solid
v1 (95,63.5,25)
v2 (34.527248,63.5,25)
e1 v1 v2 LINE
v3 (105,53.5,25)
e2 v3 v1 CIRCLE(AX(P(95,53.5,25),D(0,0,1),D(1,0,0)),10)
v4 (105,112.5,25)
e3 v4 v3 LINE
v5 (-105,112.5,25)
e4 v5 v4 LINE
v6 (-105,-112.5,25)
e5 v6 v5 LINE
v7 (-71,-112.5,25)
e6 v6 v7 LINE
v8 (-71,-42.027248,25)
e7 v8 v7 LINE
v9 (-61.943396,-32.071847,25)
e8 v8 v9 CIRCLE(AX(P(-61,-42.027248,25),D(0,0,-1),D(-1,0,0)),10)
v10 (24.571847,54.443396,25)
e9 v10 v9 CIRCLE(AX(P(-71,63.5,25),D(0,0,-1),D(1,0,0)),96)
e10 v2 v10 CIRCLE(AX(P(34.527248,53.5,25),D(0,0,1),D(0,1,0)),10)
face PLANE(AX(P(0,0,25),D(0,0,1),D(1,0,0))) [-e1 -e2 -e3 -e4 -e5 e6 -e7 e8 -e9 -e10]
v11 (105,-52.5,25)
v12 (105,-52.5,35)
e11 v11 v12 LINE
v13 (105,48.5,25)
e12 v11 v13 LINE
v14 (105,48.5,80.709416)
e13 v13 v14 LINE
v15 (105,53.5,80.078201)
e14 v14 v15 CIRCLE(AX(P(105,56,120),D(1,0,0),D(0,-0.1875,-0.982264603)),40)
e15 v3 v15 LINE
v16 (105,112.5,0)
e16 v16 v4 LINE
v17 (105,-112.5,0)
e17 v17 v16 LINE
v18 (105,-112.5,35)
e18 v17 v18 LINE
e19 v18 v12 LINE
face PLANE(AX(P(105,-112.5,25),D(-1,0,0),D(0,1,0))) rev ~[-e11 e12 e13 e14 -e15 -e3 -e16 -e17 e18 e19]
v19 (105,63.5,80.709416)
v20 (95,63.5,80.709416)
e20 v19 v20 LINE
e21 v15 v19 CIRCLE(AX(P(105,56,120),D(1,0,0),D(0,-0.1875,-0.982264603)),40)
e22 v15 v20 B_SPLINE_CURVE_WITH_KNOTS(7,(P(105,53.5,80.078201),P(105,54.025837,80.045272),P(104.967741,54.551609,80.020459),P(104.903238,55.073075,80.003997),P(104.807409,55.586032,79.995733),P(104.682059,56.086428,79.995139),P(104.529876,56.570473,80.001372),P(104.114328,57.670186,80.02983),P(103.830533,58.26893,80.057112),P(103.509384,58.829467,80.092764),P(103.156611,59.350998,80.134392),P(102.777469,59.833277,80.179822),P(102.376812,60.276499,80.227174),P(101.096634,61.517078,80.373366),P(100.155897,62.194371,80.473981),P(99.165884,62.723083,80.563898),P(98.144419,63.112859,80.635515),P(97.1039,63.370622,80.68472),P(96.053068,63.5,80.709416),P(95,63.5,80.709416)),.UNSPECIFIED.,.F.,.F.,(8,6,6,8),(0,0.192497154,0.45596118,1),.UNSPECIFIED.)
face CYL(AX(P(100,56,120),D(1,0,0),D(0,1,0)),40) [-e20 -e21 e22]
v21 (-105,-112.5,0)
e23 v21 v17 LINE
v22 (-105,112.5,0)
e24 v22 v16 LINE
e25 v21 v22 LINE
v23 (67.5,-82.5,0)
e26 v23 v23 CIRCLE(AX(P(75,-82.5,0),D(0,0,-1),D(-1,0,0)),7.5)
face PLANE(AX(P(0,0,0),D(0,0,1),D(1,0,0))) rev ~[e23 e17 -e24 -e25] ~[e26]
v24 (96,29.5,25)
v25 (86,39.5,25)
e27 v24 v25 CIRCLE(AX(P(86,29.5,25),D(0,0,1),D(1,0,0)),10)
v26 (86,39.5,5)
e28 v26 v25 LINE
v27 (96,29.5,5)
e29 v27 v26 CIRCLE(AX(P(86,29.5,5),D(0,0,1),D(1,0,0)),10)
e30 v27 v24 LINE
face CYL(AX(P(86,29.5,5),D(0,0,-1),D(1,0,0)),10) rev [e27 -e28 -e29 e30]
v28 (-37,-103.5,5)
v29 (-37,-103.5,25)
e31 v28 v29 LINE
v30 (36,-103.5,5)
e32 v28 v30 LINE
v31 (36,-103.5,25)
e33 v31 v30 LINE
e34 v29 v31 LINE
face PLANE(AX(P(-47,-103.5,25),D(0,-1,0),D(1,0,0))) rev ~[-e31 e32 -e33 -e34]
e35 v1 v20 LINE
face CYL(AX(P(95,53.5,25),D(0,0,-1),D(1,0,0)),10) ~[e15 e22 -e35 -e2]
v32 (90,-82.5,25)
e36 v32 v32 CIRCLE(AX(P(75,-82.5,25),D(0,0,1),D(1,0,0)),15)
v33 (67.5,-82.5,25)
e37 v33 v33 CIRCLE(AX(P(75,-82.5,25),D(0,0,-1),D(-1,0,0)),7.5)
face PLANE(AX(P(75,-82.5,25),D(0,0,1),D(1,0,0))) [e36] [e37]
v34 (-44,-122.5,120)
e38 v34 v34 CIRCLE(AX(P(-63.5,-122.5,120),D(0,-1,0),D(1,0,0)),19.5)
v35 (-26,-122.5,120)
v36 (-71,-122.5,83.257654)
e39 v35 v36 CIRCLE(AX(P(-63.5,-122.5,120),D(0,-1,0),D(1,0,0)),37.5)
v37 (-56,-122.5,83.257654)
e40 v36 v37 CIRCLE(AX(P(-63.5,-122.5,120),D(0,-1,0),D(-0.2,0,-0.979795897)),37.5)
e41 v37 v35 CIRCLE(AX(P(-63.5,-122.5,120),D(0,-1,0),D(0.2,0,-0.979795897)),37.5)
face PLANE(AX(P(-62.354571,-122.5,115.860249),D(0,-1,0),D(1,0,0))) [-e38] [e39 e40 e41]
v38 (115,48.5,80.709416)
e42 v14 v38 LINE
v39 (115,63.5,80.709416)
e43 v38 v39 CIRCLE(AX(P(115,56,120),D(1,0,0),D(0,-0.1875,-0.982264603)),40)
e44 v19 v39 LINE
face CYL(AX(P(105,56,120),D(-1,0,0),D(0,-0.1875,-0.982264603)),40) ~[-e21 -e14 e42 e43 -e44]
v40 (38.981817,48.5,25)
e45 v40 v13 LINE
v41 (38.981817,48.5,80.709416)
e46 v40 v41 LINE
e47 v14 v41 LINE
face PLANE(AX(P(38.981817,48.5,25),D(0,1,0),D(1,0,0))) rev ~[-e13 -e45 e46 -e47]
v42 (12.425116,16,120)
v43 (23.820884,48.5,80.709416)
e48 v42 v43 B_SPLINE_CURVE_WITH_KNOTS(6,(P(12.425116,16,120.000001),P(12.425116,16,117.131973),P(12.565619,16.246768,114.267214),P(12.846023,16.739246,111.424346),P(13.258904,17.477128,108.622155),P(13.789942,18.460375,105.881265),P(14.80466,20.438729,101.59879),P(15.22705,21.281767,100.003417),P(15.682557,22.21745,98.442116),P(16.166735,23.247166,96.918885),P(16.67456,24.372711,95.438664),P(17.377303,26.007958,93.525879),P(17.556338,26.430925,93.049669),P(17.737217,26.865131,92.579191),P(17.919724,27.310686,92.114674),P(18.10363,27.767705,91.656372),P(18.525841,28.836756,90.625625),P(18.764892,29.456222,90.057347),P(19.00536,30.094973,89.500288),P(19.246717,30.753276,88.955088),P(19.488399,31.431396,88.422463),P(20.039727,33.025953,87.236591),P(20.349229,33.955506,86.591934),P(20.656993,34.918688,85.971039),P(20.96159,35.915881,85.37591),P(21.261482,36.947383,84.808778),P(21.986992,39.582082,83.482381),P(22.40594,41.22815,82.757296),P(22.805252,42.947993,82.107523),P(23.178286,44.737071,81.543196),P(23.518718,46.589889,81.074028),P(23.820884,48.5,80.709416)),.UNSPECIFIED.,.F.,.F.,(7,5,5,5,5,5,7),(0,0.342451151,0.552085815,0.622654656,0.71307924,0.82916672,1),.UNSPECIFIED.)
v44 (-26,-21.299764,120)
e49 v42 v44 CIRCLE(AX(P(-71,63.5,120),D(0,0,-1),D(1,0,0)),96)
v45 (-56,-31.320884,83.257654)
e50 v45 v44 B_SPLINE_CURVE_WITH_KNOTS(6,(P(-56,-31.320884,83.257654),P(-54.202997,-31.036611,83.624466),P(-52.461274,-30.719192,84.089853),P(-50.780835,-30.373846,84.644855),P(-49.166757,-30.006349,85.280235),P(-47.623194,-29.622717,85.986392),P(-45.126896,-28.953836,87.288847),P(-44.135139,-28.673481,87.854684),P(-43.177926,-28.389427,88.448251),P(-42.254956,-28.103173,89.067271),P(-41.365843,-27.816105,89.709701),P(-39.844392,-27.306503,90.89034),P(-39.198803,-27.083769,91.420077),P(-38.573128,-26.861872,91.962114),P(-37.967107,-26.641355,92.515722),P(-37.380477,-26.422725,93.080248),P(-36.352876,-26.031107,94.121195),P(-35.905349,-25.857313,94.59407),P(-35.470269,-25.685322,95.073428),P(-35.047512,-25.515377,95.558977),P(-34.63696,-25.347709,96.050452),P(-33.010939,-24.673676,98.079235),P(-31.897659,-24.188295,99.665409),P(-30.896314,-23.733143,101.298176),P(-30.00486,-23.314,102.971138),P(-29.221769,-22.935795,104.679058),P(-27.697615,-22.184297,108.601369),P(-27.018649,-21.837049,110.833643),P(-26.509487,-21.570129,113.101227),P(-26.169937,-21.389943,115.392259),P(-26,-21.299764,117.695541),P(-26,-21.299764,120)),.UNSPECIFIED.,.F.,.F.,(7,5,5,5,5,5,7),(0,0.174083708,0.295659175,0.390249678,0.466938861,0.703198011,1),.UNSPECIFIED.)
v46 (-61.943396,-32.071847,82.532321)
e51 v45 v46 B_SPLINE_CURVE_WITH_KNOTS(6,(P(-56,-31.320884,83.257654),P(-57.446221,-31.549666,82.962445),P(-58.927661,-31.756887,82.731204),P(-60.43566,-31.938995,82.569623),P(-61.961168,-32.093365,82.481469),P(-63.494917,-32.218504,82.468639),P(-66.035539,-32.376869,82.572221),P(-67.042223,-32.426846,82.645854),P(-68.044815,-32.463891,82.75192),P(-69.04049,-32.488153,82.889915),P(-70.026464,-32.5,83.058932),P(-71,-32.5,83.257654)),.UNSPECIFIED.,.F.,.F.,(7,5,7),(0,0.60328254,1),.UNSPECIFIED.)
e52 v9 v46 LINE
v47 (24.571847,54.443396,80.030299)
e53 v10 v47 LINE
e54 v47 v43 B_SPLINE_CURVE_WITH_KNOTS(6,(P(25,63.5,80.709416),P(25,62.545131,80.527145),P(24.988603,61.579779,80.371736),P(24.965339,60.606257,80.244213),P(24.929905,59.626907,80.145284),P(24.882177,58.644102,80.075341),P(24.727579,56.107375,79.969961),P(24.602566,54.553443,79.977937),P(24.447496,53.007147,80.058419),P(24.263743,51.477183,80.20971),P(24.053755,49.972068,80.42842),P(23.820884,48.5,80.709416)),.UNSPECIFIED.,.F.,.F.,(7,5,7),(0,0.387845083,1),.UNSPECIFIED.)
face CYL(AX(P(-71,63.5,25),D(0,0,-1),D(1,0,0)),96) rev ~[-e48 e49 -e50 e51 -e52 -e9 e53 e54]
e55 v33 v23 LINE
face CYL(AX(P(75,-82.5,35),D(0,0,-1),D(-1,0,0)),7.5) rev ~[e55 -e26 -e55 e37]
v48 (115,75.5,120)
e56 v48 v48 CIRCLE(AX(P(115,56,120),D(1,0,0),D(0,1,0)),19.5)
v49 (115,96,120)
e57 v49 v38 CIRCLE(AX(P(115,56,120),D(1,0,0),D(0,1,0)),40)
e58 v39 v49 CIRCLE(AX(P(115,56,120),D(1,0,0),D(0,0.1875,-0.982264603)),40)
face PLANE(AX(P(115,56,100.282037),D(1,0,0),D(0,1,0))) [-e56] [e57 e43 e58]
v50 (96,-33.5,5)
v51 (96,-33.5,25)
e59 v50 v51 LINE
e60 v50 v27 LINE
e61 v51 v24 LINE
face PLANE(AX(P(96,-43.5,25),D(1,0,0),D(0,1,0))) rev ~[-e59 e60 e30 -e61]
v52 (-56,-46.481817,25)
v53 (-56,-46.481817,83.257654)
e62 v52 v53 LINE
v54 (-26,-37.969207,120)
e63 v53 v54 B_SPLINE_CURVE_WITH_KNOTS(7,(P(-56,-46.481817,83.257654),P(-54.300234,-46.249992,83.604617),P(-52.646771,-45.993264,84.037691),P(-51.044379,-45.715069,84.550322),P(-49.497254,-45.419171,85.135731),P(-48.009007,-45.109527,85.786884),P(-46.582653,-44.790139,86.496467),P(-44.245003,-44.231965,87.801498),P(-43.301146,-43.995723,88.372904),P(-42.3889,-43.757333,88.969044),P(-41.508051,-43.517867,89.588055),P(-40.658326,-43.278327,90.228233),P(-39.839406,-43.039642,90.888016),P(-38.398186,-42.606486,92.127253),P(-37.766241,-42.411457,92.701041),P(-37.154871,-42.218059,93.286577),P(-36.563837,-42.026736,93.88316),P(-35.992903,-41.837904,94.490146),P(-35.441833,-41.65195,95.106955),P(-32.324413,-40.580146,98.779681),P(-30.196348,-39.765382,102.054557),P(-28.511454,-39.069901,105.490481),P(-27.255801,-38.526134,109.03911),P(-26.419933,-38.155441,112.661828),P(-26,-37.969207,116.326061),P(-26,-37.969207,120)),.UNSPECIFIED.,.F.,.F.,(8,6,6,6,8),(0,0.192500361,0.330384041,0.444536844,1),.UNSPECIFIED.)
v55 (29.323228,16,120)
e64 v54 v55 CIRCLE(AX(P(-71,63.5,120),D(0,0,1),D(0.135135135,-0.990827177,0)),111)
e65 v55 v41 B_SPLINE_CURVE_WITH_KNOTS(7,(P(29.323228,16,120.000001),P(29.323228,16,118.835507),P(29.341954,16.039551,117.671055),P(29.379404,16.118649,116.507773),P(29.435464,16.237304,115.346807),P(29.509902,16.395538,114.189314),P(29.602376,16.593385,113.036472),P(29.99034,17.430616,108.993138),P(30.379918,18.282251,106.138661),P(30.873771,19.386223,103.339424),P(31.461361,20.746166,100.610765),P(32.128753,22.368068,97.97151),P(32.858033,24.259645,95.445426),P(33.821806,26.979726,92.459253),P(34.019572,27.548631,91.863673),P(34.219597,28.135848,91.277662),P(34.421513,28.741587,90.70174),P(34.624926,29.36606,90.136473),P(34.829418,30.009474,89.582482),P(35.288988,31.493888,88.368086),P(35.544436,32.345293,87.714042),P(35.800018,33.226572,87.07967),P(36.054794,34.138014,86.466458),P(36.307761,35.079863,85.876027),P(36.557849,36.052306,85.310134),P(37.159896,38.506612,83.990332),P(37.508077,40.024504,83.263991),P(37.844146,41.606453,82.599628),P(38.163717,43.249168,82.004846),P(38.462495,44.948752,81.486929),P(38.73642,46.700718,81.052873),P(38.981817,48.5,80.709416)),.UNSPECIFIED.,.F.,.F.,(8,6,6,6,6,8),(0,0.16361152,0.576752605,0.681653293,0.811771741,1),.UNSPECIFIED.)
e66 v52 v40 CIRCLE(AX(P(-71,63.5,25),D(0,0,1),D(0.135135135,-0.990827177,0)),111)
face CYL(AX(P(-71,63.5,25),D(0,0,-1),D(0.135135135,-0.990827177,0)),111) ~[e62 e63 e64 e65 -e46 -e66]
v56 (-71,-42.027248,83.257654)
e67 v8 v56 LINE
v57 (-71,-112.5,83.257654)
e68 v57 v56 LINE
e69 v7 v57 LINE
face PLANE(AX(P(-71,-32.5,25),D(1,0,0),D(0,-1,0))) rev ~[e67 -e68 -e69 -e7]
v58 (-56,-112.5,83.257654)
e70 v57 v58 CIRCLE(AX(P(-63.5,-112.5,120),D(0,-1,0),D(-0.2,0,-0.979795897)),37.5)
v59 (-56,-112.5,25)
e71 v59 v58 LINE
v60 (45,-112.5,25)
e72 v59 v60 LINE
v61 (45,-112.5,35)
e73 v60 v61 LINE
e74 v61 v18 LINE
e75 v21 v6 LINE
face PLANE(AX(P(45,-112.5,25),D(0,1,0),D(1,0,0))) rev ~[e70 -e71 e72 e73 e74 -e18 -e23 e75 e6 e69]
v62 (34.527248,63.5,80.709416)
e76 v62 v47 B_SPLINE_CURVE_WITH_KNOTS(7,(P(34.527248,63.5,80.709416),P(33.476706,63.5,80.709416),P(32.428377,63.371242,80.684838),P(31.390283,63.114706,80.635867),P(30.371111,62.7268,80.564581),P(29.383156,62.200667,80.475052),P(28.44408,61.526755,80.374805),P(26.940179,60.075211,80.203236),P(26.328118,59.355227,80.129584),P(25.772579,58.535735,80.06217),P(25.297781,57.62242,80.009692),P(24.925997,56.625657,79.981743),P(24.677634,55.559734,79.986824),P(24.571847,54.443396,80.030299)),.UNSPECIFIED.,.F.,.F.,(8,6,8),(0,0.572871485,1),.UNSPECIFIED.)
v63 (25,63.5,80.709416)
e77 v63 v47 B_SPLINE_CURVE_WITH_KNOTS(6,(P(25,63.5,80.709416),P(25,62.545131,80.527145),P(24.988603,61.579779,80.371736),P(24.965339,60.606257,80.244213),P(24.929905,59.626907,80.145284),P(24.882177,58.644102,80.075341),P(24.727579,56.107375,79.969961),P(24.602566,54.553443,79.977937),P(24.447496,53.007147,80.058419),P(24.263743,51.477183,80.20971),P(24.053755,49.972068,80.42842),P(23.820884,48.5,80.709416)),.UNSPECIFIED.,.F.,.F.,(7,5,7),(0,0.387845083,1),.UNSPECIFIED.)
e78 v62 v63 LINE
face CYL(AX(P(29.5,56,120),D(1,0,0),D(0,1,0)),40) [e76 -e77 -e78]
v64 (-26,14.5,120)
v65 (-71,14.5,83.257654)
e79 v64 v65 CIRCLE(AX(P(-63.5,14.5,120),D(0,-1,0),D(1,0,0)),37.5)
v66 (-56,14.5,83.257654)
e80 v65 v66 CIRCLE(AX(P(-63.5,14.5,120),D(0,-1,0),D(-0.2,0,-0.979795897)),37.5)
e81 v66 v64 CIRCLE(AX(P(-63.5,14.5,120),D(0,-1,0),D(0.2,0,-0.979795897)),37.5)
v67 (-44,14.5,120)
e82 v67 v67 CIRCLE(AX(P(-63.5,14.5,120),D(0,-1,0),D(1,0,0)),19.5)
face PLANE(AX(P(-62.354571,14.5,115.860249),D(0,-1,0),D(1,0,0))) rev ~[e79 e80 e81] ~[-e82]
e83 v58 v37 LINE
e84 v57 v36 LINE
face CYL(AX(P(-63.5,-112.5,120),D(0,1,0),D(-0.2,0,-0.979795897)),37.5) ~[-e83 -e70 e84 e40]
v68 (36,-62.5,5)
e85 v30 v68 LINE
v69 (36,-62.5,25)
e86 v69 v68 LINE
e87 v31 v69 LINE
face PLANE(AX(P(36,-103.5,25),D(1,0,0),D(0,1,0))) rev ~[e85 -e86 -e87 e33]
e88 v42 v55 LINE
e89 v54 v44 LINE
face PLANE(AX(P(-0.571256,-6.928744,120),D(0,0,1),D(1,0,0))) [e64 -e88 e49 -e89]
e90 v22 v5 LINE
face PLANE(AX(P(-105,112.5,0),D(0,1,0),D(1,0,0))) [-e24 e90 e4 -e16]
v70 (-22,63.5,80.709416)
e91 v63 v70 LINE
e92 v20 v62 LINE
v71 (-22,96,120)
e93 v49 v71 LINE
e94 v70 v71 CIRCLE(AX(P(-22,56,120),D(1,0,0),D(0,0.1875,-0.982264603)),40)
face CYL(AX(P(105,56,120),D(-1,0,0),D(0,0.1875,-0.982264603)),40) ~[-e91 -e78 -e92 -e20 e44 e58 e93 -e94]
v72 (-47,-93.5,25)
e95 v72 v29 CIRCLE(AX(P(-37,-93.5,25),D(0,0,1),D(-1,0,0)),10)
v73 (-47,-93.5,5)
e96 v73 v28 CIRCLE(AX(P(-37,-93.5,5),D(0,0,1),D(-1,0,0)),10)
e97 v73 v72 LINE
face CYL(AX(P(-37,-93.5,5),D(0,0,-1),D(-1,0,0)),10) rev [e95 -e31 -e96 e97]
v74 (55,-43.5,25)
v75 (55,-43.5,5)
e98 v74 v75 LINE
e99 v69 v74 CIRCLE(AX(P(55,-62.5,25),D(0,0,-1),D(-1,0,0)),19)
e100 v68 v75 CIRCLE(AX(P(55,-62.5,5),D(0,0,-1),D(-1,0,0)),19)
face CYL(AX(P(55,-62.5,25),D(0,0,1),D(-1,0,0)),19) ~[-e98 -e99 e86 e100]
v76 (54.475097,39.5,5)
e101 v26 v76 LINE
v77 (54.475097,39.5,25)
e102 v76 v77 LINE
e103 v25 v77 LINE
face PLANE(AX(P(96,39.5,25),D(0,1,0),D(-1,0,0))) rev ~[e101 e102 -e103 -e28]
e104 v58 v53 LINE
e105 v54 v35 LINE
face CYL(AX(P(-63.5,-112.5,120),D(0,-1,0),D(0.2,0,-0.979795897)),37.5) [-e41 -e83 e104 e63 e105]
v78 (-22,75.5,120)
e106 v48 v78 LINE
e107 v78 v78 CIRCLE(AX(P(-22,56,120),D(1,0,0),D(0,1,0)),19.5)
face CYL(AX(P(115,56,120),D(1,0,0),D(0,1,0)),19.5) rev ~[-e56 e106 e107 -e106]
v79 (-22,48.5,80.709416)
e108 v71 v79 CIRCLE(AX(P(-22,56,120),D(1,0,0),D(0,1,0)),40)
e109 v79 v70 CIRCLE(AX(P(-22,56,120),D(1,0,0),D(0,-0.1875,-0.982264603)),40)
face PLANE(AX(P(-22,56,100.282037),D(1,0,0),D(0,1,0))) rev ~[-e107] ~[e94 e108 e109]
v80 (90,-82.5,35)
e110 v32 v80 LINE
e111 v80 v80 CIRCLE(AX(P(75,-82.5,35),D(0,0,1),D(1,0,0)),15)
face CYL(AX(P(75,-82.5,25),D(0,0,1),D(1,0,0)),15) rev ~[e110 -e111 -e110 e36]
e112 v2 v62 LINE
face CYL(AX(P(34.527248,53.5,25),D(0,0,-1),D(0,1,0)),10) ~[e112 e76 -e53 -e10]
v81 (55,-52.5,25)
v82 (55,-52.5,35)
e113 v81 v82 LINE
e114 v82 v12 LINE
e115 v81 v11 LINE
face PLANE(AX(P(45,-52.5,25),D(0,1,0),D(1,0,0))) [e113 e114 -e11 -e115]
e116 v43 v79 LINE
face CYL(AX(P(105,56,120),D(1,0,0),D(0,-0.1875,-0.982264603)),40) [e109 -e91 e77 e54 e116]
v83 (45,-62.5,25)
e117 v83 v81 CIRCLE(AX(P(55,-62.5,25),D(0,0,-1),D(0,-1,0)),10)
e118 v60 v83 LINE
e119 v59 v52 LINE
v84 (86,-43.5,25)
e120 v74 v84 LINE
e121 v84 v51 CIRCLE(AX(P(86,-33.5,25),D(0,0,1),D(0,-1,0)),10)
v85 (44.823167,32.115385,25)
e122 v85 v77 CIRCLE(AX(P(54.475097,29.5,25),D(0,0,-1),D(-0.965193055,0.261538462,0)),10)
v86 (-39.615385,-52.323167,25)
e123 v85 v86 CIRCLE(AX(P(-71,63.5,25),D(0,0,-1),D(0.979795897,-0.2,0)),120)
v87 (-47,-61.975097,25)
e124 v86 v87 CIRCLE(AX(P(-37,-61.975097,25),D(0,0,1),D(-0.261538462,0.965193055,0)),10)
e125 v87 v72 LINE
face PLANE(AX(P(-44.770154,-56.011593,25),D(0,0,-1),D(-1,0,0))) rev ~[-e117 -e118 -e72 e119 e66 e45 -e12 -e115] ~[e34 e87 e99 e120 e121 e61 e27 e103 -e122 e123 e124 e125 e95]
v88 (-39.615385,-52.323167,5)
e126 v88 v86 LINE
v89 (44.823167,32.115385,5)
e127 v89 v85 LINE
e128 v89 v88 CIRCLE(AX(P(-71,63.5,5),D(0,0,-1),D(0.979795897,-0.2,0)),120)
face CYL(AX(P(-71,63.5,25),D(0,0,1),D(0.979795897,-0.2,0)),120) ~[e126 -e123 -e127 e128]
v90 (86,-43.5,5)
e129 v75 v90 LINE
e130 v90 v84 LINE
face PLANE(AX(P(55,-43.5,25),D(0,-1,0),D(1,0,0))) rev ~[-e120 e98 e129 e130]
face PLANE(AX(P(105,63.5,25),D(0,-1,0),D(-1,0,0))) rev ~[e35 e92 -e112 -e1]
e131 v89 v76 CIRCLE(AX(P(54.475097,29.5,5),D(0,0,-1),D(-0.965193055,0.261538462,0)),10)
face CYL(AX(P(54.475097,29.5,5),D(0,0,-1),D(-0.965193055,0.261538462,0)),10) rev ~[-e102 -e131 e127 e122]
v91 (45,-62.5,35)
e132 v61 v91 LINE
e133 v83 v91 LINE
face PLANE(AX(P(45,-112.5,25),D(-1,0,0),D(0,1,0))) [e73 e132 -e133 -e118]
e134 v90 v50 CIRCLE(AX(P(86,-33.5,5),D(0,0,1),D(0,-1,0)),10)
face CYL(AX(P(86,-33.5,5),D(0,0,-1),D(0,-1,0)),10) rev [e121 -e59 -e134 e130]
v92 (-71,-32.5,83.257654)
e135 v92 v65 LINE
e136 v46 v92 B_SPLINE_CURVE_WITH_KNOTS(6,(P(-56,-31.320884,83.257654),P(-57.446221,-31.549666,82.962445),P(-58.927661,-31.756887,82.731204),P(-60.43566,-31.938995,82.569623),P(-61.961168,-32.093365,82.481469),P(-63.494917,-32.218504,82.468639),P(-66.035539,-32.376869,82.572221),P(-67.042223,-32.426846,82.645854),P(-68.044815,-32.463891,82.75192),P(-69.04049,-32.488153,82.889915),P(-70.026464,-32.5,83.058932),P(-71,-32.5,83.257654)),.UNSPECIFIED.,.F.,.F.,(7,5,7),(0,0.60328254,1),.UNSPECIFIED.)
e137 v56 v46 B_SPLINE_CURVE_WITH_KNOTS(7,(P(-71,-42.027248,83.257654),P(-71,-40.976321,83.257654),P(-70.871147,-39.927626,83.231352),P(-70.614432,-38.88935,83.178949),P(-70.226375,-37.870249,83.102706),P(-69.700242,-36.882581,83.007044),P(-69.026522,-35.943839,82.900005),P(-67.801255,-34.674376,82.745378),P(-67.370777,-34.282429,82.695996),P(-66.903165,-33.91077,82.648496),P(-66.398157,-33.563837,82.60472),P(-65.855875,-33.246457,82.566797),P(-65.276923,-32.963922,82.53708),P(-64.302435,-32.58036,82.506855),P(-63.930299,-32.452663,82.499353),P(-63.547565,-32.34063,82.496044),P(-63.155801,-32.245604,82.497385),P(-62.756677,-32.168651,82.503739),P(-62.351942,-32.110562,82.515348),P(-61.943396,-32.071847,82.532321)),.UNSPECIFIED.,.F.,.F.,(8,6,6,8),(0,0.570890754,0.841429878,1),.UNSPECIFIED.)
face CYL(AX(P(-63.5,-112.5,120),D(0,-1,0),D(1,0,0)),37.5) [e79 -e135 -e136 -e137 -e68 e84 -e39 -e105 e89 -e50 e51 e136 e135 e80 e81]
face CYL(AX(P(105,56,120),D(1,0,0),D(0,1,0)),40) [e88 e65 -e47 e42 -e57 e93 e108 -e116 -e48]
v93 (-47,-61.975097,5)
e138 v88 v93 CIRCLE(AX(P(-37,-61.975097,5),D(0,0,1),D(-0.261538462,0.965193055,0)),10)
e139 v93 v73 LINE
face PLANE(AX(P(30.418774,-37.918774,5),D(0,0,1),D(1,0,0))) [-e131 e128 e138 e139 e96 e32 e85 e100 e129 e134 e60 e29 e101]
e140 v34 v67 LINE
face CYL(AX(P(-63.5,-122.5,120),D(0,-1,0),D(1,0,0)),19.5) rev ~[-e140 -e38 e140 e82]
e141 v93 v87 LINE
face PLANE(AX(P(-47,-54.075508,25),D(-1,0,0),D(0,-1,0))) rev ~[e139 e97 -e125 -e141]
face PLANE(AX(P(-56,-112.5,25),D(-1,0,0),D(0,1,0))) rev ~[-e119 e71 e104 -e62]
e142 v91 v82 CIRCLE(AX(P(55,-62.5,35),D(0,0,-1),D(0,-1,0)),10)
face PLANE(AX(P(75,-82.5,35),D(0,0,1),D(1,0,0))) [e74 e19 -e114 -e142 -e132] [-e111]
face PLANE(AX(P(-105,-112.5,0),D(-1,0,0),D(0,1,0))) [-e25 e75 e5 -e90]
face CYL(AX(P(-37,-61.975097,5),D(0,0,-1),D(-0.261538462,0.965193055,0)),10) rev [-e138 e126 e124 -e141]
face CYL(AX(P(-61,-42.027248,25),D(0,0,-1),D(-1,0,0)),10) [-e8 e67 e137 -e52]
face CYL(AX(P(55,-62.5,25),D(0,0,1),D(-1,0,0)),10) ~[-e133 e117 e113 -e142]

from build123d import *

# Parameters (mm, degrees)
F0_W            = 210
F0_H            = 225
F1_DEPTH        = 25
F3_DEPTH        = 95
F5_DEPTH        = 10
F5_DEPTH_BACK   = 127
F7_DEPTH        = 10
F7_DEPTH_BACK   = 127
F8_W            = 60
F8_H            = 60
F9_DEPTH        = 10
F10_R           = 10
F12_DEPTH       = 20
F14_D           = 15
F14_CBORE_D     = 30
F14_CBORE_DEPTH = 10
F15_T1_DEPTH    = 20
F15_T6_DEPTH    = 80.7094158862
F15_S7_R        = 40
F15_T8_DEPTH    = 42
F15_T12_DEPTH   = 79.5275350517
F15_S13_R       = 40
F15_T14_DEPTH   = 42
F15_T18_DEPTH   = 82.0757730237
F15_S19_R       = 37.5
F15_T20_DEPTH   = 43
F16_R           = 19.5
F17_DEPTH       = 235.001
F18_R           = 19.5
F19_DEPTH       = 220.001


# Not quite as in the source:
# - a fillet or chamfer that OpenCascade refuses, or shapes differently, is made with other operations: its cross-section is extruded or revolved along the edge and cut away or added


with BuildPart() as f1:
    # F0 (on Top) → F1 (new body)
    with BuildSketch(Plane.XY):
        Rectangle(F0_W, F0_H)
    extrude(amount=F1_DEPTH)

    # F2 (on face) → F3 (join)
    with BuildSketch(Plane.XY.offset(25)):
        with BuildLine():
            Line((105, 48.5), (105, 63.5))
            Line((105, 63.5), (25, 63.5))
            ThreePointArc((25, 63.5), (-3.1177490061, -4.3822509939), (-71, -32.5))
            Line((-71, -32.5), (-71, -112.5))
            Line((-71, -112.5), (-56, -112.5))
            Line((-56, -112.5), (-56, -46.4818166789))
            ThreePointArc((-56, -46.4818166789), (7.4888527117, -14.9888527117), (38.9818166789, 48.5))
            Line((38.9818166789, 48.5), (105, 48.5))
        make_face()
    extrude(amount=F3_DEPTH)

    # F4 (on face) → F5 (join, two sides)
    with BuildSketch(Plane.XZ.offset(112.5)) as f5_sk:
        with BuildLine():
            ThreePointArc((-56, 83.2576538583), (-34.4526249034, 96.2829175487), (-26, 120))
            ThreePointArc((-26, 120), (-87.2170824513, 149.0473750966), (-71, 83.2576538583))
            Line((-71, 83.2576538583), (-71, 120))
            Line((-71, 120), (-56, 120))
            Line((-56, 120), (-56, 83.2576538583))
        make_face()
        with BuildLine():
            Line((-71, 120), (-71, 83.2576538583))
            ThreePointArc((-71, 83.2576538583), (-63.5, 82.5), (-56, 83.2576538583))
            Line((-56, 83.2576538583), (-56, 120))
            Line((-56, 120), (-71, 120))
        make_face()
    extrude(amount=F5_DEPTH)
    extrude(f5_sk.sketch, amount=-F5_DEPTH_BACK)

    # F6 (on face) → F7 (join, two sides)
    with BuildSketch(Plane.YZ.offset(105)) as f7_sk:
        with BuildLine():
            Line((48.5, 120), (48.5, 80.7094158862))
            ThreePointArc((48.5, 80.7094158862), (56, 80), (63.5, 80.7094158862))
            Line((63.5, 80.7094158862), (63.5, 120))
            Line((63.5, 120), (48.5, 120))
        make_face()
        with BuildLine():
            ThreePointArc((63.5, 80.7094158862), (86.8220700148, 94.504902432), (96, 120))
            ThreePointArc((96, 120), (30.504902432, 150.8220700148), (48.5, 80.7094158862))
            Line((48.5, 80.7094158862), (48.5, 120))
            Line((48.5, 120), (63.5, 120))
            Line((63.5, 120), (63.5, 80.7094158862))
        make_face()
    extrude(amount=F7_DEPTH)
    extrude(f7_sk.sketch, amount=-F7_DEPTH_BACK)

    # F8 (on face) → F9 (join)
    with BuildSketch(Plane.XY.offset(25)):
        with Locations((75, -82.5)):
            Rectangle(F8_W, F8_H)
    extrude(amount=F9_DEPTH)

    # F10
    f10_edges = [f1.edges().sort_by_distance(p)[0] for p in [
        (45, -52.5, 30),
    ]]
    fillet(f10_edges, radius=F10_R)

    # F11 (on face) → F12 (cut)
    with BuildSketch(Plane.XY.offset(25)):
        with BuildLine():
            ThreePointArc((46.5755076536, 39.5), (13.8528137424, -21.3528137424), (-47, -54.0755076536))
            Line((-47, -54.0755076536), (-47, -103.5))
            Line((-47, -103.5), (36, -103.5))
            Line((36, -103.5), (36, -62.5))
            ThreePointArc((36, -62.5), (41.5649711575, -49.0649711575), (55, -43.5))
            Line((55, -43.5), (96, -43.5))
            Line((96, -43.5), (96, 39.5))
            Line((96, 39.5), (46.5755076536, 39.5))
        make_face()
    extrude(amount=-F12_DEPTH, mode=Mode.SUBTRACT)

    # F14 (through all)
    with Locations(Plane.XY.offset(35)):
        with Locations((75, -82.5)):
            CounterBoreHole(F14_D / 2, F14_CBORE_D / 2, F14_CBORE_DEPTH)

    # F15: fillet of radius 10 on 8 edges, made by hand

    # F15_s2 → F15_t1 (join)
    with BuildSketch(Plane.XY.offset(5)):
        with BuildLine():
            ThreePointArc((-39.6153846154, -52.3231665823), (-44.9420981533, -55.8986609284), (-47, -61.9750971309))
            Line((-47, -61.9750971309), (-47, -54.0755076536))
            ThreePointArc((-47, -54.0755076536), (-43.2938349797, -53.257733876), (-39.6153846154, -52.3231665823))
        make_face()
        with BuildLine():
            ThreePointArc((44.8231665823, 32.1153846154), (48.3986609284, 37.4420981533), (54.4750971309, 39.5))
            Line((54.4750971309, 39.5), (46.5755076536, 39.5))
            ThreePointArc((46.5755076536, 39.5), (45.757733876, 35.7938349797), (44.8231665823, 32.1153846154))
        make_face()
        with BuildLine():
            ThreePointArc((96, 29.5), (93.0710678119, 36.5710678119), (86, 39.5))
            Line((86, 39.5), (96, 39.5))
            Line((96, 39.5), (96, 29.5))
        make_face()
        with BuildLine():
            ThreePointArc((86, -43.5), (93.0710678119, -40.5710678119), (96, -33.5))
            Line((96, -33.5), (96, -43.5))
            Line((96, -43.5), (86, -43.5))
        make_face()
        with BuildLine():
            ThreePointArc((-47, -93.5), (-44.0710678119, -100.5710678119), (-37, -103.5))
            Line((-37, -103.5), (-47, -103.5))
            Line((-47, -103.5), (-47, -93.5))
        make_face()
    extrude(amount=F15_T1_DEPTH)


with BuildPart() as f15_tool4:
    # F15_s5 → F15_t6 (new body)
    with BuildSketch(Plane.XY.offset(25)):
        with BuildLine():
            ThreePointArc((105, 53.5), (102.0710678119, 60.5710678119), (95, 63.5))
            Line((95, 63.5), (105, 63.5))
            Line((105, 63.5), (105, 53.5))
        make_face()
    extrude(amount=F15_T6_DEPTH)

    # F15_s7 → F15_t8 (cut, symmetric)
    with BuildSketch(Plane.YZ.offset(100)):
        with Locations((56, 120)):
            Circle(F15_S7_R)
    extrude(amount=F15_T8_DEPTH, both=True, mode=Mode.SUBTRACT)


with BuildPart() as f1_1:
    add(f1.part)

    # F15_t3: cut F15_tool4
    add(f15_tool4.part, mode=Mode.SUBTRACT)


with BuildPart() as f15_tool10:
    # F15_s11 → F15_t12 (new body)
    with BuildSketch(Plane.XY.offset(25)):
        with BuildLine():
            ThreePointArc((34.5272476662, 63.5), (27.7979818171, 60.8970927486), (24.571846943, 54.4433962264))
            ThreePointArc((24.571846943, 54.4433962264), (24.8929019962, 58.9666406785), (25, 63.5))
            Line((25, 63.5), (34.5272476662, 63.5))
        make_face()
    extrude(amount=F15_T12_DEPTH)

    # F15_s13 → F15_t14 (cut, symmetric)
    with BuildSketch(Plane.YZ.offset(29.5)):
        with Locations((56, 120)):
            Circle(F15_S13_R)
    extrude(amount=F15_T14_DEPTH, both=True, mode=Mode.SUBTRACT)


with BuildPart() as f1_2:
    add(f1_1.part)

    # F15_t9: cut F15_tool10
    add(f15_tool10.part, mode=Mode.SUBTRACT)


with BuildPart() as f15_tool16:
    # F15_s17 → F15_t18 (new body)
    with BuildSketch(Plane.XY.offset(25)):
        with BuildLine():
            ThreePointArc((-71, -42.0272476662), (-68.3970927486, -35.2979818171), (-61.9433962264, -32.071846943))
            ThreePointArc((-61.9433962264, -32.071846943), (-66.4666406785, -32.3929019962), (-71, -32.5))
            Line((-71, -32.5), (-71, -42.0272476662))
        make_face()
    extrude(amount=F15_T18_DEPTH)

    # F15_s19 → F15_t20 (cut, symmetric)
    with BuildSketch(Plane.XZ.offset(37)):
        with Locations((-63.5, 120)):
            Circle(F15_S19_R)
    extrude(amount=F15_T20_DEPTH, both=True, mode=Mode.SUBTRACT)


with BuildPart() as f1_3:
    add(f1_2.part)

    # F15_t15: cut F15_tool16
    add(f15_tool16.part, mode=Mode.SUBTRACT)

    # F16 (on face) → F17 (cut, through all)
    with BuildSketch(Plane.XZ.offset(122.5)):
        with Locations((-63.5, 120)):
            Circle(F16_R)
    extrude(amount=-F17_DEPTH, mode=Mode.SUBTRACT)

    # F18 (on face) → F19 (cut, through all)
    with BuildSketch(Plane.YZ.offset(115)):
        with Locations((56, 120)):
            Circle(F18_R)
    extrude(amount=-F19_DEPTH, mode=Mode.SUBTRACT)


solid = f1_3.part
